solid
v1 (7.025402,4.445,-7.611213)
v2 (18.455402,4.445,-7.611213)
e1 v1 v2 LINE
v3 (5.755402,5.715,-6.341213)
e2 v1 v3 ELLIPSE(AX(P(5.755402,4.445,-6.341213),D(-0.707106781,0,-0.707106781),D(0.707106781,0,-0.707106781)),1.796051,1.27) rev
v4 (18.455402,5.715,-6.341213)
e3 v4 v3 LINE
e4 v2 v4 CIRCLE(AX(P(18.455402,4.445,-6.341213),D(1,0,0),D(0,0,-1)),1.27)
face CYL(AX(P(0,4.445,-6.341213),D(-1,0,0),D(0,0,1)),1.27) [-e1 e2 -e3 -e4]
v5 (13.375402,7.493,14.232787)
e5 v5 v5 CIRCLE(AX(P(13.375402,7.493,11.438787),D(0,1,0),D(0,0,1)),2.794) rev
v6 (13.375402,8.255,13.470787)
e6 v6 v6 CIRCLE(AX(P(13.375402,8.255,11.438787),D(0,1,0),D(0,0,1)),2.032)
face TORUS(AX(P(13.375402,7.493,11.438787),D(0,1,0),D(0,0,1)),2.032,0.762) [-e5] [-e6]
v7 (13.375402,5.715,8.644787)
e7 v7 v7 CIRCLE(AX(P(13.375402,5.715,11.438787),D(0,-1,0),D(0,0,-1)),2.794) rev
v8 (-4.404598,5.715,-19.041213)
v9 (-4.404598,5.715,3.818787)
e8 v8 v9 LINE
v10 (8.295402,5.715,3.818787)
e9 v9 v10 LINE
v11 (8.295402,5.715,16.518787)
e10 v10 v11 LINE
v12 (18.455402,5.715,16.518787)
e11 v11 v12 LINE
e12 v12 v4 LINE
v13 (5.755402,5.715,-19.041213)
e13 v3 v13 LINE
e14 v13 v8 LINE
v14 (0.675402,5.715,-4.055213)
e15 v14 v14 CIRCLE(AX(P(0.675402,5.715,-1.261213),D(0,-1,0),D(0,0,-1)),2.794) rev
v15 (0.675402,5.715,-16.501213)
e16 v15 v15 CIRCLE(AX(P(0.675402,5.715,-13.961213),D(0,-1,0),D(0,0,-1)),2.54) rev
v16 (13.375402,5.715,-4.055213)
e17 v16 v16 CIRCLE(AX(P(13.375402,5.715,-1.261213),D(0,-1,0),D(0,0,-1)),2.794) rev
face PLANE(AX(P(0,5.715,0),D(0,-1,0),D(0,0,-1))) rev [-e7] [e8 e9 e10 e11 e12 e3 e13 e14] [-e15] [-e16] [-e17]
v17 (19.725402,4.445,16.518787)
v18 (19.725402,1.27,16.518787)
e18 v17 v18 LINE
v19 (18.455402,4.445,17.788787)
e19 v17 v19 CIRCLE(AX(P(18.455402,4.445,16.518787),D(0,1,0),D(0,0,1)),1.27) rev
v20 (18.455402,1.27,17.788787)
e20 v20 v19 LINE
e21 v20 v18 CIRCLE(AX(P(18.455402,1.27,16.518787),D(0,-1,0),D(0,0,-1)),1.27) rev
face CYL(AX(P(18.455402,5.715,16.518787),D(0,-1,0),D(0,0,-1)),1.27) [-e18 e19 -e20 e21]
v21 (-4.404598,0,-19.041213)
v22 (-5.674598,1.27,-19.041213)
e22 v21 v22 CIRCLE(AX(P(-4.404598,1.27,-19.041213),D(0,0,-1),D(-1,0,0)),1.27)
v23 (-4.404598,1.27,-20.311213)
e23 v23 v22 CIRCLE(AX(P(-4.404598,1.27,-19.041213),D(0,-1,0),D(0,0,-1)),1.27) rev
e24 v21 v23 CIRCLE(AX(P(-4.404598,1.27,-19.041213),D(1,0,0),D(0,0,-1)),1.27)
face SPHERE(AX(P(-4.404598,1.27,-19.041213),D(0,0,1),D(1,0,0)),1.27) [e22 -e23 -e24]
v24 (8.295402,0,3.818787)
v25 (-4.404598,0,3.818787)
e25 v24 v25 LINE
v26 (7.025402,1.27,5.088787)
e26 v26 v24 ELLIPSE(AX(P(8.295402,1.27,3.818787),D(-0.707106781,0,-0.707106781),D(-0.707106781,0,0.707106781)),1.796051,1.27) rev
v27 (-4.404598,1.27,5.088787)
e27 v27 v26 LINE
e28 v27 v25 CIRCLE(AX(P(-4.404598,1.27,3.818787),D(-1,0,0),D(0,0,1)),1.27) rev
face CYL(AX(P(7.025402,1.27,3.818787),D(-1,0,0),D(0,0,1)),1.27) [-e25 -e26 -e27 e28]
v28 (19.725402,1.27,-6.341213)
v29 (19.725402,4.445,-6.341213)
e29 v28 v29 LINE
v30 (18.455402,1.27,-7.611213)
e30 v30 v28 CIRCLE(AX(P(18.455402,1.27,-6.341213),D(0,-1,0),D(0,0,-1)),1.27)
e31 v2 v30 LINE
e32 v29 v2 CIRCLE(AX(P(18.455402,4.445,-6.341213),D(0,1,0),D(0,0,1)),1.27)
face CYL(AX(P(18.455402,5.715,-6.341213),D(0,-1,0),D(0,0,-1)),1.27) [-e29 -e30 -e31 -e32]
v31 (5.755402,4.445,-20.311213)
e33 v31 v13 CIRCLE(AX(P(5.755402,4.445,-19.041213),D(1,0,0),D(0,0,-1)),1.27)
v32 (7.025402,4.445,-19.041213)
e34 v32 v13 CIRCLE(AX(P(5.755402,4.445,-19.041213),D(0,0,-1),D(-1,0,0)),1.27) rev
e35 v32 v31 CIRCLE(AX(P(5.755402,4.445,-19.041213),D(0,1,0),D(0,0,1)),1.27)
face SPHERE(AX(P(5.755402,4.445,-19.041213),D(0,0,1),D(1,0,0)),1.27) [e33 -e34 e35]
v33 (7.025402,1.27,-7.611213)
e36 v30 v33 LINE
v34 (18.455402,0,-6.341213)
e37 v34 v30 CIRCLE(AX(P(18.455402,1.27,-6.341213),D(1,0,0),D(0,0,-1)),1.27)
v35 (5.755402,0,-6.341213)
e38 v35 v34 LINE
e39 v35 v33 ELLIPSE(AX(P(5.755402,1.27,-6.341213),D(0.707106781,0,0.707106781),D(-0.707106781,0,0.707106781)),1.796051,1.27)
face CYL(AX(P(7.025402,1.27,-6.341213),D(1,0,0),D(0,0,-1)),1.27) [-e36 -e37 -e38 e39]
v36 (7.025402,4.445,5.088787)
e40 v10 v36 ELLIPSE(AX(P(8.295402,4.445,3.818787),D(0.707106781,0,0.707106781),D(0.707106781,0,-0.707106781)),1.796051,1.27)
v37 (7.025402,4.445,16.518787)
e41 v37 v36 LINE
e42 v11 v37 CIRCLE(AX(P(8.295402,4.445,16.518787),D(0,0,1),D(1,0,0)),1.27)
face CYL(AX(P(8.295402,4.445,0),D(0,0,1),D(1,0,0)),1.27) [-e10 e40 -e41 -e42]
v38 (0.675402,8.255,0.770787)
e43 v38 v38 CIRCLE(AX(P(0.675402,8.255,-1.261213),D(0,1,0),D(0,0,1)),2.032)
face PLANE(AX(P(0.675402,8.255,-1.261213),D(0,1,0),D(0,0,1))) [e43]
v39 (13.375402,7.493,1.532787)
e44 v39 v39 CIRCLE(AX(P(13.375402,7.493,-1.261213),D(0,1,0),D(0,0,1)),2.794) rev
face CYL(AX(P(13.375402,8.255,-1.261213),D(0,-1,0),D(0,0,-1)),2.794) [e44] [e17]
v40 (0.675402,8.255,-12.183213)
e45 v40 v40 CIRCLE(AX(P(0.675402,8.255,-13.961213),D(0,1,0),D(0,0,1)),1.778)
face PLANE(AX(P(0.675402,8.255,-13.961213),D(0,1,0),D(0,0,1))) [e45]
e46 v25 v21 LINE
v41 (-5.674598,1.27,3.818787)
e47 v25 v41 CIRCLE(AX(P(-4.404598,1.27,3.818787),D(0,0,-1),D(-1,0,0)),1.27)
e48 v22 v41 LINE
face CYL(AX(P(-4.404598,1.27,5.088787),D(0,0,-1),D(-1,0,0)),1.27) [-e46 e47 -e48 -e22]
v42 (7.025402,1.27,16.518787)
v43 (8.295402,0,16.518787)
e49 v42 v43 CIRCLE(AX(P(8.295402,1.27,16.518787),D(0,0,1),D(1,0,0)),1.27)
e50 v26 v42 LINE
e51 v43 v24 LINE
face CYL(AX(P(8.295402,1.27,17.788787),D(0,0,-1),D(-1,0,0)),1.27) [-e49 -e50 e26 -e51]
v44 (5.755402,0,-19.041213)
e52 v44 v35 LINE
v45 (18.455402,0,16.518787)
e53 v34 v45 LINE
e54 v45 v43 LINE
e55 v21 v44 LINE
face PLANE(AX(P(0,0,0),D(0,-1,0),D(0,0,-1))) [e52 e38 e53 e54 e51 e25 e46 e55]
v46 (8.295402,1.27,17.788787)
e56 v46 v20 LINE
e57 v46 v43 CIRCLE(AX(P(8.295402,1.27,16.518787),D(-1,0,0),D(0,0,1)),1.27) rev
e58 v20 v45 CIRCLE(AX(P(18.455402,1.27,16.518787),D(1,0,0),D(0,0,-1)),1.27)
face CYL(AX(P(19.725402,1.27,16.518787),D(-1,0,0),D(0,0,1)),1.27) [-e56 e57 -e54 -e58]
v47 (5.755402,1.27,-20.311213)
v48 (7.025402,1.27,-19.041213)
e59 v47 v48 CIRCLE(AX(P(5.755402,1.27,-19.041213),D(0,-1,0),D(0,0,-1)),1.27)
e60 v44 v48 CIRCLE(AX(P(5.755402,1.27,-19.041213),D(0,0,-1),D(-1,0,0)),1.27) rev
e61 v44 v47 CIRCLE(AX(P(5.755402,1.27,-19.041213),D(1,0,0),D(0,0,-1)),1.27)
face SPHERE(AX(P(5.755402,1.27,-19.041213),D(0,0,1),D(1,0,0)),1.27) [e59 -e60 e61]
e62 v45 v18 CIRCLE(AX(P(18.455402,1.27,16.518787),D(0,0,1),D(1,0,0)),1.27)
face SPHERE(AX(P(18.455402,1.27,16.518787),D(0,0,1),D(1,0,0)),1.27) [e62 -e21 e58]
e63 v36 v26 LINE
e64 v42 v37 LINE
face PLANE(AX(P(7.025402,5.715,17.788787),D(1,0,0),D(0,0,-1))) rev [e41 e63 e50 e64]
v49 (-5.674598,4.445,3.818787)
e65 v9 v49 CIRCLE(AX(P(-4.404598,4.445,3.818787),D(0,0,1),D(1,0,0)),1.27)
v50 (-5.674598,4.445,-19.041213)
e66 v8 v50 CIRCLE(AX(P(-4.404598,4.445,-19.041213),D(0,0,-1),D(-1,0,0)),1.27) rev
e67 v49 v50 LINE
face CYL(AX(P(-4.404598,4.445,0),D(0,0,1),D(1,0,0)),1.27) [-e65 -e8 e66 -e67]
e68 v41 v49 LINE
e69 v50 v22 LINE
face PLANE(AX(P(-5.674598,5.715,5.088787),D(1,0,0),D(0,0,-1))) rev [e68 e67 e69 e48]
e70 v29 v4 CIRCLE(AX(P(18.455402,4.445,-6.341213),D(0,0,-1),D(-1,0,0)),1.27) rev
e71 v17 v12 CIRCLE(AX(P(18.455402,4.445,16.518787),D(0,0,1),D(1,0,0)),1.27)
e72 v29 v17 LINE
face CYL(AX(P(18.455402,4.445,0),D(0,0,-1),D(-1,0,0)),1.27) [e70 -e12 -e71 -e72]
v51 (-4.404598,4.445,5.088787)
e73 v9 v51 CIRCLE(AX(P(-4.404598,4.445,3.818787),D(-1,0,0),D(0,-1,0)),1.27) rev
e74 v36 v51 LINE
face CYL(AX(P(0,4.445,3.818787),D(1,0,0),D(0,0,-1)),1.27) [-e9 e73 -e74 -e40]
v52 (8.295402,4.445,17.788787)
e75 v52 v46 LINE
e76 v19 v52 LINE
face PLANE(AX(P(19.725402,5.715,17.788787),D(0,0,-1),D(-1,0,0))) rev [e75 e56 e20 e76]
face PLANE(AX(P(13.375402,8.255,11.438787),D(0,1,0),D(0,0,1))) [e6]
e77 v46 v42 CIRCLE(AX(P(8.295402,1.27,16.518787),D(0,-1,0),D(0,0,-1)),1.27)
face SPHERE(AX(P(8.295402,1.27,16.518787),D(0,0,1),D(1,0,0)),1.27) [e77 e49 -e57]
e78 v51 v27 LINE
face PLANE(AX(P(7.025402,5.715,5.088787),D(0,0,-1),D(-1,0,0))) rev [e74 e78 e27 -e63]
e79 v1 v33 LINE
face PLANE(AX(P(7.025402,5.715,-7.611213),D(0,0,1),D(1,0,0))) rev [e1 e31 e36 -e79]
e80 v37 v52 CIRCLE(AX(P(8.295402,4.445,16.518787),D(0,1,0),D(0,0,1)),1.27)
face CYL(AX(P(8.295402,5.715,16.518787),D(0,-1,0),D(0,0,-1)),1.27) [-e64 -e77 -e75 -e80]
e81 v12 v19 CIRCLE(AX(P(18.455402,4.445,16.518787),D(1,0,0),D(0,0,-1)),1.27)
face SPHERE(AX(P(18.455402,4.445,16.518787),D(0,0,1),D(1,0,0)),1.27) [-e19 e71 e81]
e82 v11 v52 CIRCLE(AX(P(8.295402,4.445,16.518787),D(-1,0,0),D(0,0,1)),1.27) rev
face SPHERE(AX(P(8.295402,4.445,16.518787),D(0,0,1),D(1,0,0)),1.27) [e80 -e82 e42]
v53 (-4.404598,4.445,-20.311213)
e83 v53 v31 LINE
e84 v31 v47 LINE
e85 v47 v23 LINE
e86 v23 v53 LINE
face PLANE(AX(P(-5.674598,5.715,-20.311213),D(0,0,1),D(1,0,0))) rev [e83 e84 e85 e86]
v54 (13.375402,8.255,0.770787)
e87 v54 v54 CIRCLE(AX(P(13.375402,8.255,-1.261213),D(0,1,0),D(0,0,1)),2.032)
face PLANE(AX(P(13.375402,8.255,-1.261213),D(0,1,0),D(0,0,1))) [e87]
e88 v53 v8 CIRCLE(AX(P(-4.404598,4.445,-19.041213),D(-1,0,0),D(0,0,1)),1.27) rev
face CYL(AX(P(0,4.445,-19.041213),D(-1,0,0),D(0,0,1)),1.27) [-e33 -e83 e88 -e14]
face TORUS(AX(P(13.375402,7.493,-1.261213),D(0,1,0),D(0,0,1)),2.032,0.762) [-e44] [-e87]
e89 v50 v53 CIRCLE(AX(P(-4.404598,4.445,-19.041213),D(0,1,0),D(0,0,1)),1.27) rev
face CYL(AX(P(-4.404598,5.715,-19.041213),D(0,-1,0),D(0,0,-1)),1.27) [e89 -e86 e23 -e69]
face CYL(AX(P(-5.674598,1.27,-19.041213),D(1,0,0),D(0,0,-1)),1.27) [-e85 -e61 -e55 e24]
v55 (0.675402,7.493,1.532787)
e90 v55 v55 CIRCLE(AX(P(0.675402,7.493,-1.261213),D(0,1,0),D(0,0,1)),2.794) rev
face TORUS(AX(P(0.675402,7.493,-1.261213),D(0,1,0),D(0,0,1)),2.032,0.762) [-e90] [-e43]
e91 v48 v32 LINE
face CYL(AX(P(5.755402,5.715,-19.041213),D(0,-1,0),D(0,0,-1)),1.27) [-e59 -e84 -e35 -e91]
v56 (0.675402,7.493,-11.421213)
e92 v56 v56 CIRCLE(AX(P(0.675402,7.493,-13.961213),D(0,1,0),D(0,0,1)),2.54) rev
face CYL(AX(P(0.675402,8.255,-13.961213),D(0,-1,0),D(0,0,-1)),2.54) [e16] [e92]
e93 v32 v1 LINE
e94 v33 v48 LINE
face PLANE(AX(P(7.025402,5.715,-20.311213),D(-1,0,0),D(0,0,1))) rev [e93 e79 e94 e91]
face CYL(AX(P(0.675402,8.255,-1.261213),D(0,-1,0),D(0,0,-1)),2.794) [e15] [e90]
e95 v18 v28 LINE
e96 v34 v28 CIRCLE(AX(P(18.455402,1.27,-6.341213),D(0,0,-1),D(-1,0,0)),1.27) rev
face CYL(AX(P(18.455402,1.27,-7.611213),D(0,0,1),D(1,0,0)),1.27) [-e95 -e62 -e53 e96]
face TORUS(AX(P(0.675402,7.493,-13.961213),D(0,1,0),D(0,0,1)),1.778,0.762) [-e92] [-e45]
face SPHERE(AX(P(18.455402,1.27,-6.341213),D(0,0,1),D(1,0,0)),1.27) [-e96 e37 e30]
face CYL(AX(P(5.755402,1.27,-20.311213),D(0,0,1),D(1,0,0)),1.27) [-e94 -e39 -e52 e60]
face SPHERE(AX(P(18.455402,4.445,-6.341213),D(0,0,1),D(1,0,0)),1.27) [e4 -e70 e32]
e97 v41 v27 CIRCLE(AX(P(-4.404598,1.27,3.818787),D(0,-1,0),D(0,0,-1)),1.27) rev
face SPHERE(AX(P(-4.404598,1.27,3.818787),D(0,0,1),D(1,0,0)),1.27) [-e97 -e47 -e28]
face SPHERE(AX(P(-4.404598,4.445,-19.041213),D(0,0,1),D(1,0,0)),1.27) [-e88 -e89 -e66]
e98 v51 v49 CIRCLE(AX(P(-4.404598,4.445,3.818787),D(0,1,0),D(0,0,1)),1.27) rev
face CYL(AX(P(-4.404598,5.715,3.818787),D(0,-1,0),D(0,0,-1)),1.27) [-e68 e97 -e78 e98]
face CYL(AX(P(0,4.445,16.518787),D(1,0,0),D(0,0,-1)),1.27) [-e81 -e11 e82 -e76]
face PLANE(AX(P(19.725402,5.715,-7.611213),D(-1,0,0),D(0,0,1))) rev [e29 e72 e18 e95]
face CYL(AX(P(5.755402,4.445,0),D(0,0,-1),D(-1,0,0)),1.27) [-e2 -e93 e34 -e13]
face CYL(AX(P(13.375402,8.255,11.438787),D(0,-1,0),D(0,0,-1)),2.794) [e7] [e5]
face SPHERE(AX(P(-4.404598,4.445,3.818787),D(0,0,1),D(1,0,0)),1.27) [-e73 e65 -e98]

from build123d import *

# Parameters (mm, degrees)
BOSS_EXTRUDE1_DEPTH = 5.715
SKETCH2_R           = 2.794
SKETCH2_R_2         = 2.54
BOSS_EXTRUDE3_DEPTH = 2.54
FILLET1_R           = 1.27
FILLET2_R           = 1.27
FILLET3_R           = 0.762


with BuildPart() as part:
    # Sketch1 → Boss-Extrude1 (new body)
    with BuildSketch(Plane(origin=(0, 0, 0), x_dir=(1, 0, 0), z_dir=(0, 1, 0))):
        Polygon((-5.674598366, 20.311212687), (7.025401634, 20.311212687), (7.025401634, 7.611212687), (19.725401634, 7.611212687), (19.725401634, -17.788787313), (7.025401634, -17.788787313), (7.025401634, -5.088787313), (-5.674598366, -5.088787313), align=None)
    extrude(amount=BOSS_EXTRUDE1_DEPTH)

    # Sketch2 → Boss-Extrude3 (add)
    with BuildSketch(Plane(origin=(0, 5.715, 0), x_dir=(1, 0, 0), z_dir=(0, 1, 0))):
        with Locations(Location((0.675401634, 1.261212687, 0), (0, 0, 90))):
            Circle(SKETCH2_R)
        with Locations(Location((13.375401634, 1.261212687, 0), (0, 0, 90))):
            Circle(SKETCH2_R)
        with Locations(Location((0.675401634, 13.961212687, 0), (0, 0, 90))):
            Circle(SKETCH2_R_2)
        with Locations(Location((13.375401634, -11.438787313, 0), (0, 0, 90))):
            Circle(SKETCH2_R)
    extrude(amount=BOSS_EXTRUDE3_DEPTH)

    # Fillet1
    fillet1_edges = [part.edges().sort_by_distance(p)[0] for p in [
        (7.025401634, 5.715, 11.438787313),
        (0.675401634, 0, 5.088787313),
        (13.375401634, 5.715, 17.788787313),
        (-5.674598366, 2.8575, -20.311212687),
        (7.025401634, 2.8575, -20.311212687),
        (19.725401634, 2.8575, -7.611212687),
        (19.725401634, 2.8575, 17.788787313),
        (7.025401634, 2.8575, 17.788787313),
        (-5.674598366, 2.8575, 5.088787313),
        (19.725401634, 5.715, 5.088787313),
        (13.375401634, 5.715, -7.611212687),
        (7.025401634, 5.715, -13.961212687),
        (0.675401634, 5.715, -20.311212687),
        (-5.674598366, 5.715, -7.611212687),
        (0.675401634, 5.715, 5.088787313),
        (0.675401634, 0, -20.311212687),
        (7.025401634, 0, -13.961212687),
        (13.375401634, 0, -7.611212687),
        (19.725401634, 0, 5.088787313),
        (13.375401634, 0, 17.788787313),
        (7.025401634, 0, 11.438787313),
    ]]
    fillet(fillet1_edges, radius=FILLET1_R)

    # Fillet2
    # the kernel refuses this fillet: 1.27 mm, written as the material it takes off along each edge
    with BuildSketch(Plane(origin=(-4.404598366, 1.27, -19.041212687), x_dir=(0, -1, 0), z_dir=(-1, 0, 0))) as fillet2_piece_1_section:
        Polygon((0, 0), (FILLET2_R, 0), (FILLET2_R, -FILLET2_R), (0, -FILLET2_R), align=None)
    fillet2_piece_1 = extrude(amount=FILLET2_R, mode=Mode.PRIVATE)
    fillet2_piece_1 = fillet2_piece_1 - Plane(origin=(-4.404598366, 1.27, -19.041212687), x_dir=(0, 0.7071067811865475, 0.7071067811865475), z_dir=(-1, 0, 0)) * Sphere(FILLET2_R, mode=Mode.PRIVATE)
    add(fillet2_piece_1, mode=Mode.SUBTRACT)
    with BuildSketch(Plane(origin=(-4.404598366, 1.27, 3.818787313), x_dir=(0, -1, 0), z_dir=(-1, 0, 0))) as fillet2_piece_2_section:
        Polygon((0, 0), (FILLET2_R, 0), (FILLET2_R, FILLET2_R), (0, FILLET2_R), align=None)
    fillet2_piece_2 = extrude(amount=FILLET2_R, mode=Mode.PRIVATE)
    fillet2_piece_2 = fillet2_piece_2 - Plane(origin=(-4.404598366, 1.27, 3.818787313), x_dir=(0, 0.7071067811865475, -0.7071067811865475), z_dir=(-1, 0, 0)) * Sphere(FILLET2_R, mode=Mode.PRIVATE)
    add(fillet2_piece_2, mode=Mode.SUBTRACT)
    with BuildSketch(Plane(origin=(-5.674598366, 0, 3.818787313), x_dir=(0, 1, 0), z_dir=(0, 0, -1))) as fillet2_piece_3:
        with BuildLine():
            CenterArc((FILLET2_R, FILLET2_R), FILLET2_R, 180, 90)
            Line((0, FILLET2_R), (0, 0))
            Line((0, 0), (FILLET2_R, 0))
        make_face()
    extrude(amount=22.86, mode=Mode.SUBTRACT)

    # Fillet3
    fillet3_edges = [part.edges().sort_by_distance(p)[0] for p in [
        (0.675401634, 8.255, 1.532787313),
        (13.375401634, 8.255, 1.532787313),
        (0.675401634, 8.255, -11.421212687),
        (13.375401634, 8.255, 14.232787313),
    ]]
    fillet(fillet3_edges, radius=FILLET3_R)


solid = part.part
